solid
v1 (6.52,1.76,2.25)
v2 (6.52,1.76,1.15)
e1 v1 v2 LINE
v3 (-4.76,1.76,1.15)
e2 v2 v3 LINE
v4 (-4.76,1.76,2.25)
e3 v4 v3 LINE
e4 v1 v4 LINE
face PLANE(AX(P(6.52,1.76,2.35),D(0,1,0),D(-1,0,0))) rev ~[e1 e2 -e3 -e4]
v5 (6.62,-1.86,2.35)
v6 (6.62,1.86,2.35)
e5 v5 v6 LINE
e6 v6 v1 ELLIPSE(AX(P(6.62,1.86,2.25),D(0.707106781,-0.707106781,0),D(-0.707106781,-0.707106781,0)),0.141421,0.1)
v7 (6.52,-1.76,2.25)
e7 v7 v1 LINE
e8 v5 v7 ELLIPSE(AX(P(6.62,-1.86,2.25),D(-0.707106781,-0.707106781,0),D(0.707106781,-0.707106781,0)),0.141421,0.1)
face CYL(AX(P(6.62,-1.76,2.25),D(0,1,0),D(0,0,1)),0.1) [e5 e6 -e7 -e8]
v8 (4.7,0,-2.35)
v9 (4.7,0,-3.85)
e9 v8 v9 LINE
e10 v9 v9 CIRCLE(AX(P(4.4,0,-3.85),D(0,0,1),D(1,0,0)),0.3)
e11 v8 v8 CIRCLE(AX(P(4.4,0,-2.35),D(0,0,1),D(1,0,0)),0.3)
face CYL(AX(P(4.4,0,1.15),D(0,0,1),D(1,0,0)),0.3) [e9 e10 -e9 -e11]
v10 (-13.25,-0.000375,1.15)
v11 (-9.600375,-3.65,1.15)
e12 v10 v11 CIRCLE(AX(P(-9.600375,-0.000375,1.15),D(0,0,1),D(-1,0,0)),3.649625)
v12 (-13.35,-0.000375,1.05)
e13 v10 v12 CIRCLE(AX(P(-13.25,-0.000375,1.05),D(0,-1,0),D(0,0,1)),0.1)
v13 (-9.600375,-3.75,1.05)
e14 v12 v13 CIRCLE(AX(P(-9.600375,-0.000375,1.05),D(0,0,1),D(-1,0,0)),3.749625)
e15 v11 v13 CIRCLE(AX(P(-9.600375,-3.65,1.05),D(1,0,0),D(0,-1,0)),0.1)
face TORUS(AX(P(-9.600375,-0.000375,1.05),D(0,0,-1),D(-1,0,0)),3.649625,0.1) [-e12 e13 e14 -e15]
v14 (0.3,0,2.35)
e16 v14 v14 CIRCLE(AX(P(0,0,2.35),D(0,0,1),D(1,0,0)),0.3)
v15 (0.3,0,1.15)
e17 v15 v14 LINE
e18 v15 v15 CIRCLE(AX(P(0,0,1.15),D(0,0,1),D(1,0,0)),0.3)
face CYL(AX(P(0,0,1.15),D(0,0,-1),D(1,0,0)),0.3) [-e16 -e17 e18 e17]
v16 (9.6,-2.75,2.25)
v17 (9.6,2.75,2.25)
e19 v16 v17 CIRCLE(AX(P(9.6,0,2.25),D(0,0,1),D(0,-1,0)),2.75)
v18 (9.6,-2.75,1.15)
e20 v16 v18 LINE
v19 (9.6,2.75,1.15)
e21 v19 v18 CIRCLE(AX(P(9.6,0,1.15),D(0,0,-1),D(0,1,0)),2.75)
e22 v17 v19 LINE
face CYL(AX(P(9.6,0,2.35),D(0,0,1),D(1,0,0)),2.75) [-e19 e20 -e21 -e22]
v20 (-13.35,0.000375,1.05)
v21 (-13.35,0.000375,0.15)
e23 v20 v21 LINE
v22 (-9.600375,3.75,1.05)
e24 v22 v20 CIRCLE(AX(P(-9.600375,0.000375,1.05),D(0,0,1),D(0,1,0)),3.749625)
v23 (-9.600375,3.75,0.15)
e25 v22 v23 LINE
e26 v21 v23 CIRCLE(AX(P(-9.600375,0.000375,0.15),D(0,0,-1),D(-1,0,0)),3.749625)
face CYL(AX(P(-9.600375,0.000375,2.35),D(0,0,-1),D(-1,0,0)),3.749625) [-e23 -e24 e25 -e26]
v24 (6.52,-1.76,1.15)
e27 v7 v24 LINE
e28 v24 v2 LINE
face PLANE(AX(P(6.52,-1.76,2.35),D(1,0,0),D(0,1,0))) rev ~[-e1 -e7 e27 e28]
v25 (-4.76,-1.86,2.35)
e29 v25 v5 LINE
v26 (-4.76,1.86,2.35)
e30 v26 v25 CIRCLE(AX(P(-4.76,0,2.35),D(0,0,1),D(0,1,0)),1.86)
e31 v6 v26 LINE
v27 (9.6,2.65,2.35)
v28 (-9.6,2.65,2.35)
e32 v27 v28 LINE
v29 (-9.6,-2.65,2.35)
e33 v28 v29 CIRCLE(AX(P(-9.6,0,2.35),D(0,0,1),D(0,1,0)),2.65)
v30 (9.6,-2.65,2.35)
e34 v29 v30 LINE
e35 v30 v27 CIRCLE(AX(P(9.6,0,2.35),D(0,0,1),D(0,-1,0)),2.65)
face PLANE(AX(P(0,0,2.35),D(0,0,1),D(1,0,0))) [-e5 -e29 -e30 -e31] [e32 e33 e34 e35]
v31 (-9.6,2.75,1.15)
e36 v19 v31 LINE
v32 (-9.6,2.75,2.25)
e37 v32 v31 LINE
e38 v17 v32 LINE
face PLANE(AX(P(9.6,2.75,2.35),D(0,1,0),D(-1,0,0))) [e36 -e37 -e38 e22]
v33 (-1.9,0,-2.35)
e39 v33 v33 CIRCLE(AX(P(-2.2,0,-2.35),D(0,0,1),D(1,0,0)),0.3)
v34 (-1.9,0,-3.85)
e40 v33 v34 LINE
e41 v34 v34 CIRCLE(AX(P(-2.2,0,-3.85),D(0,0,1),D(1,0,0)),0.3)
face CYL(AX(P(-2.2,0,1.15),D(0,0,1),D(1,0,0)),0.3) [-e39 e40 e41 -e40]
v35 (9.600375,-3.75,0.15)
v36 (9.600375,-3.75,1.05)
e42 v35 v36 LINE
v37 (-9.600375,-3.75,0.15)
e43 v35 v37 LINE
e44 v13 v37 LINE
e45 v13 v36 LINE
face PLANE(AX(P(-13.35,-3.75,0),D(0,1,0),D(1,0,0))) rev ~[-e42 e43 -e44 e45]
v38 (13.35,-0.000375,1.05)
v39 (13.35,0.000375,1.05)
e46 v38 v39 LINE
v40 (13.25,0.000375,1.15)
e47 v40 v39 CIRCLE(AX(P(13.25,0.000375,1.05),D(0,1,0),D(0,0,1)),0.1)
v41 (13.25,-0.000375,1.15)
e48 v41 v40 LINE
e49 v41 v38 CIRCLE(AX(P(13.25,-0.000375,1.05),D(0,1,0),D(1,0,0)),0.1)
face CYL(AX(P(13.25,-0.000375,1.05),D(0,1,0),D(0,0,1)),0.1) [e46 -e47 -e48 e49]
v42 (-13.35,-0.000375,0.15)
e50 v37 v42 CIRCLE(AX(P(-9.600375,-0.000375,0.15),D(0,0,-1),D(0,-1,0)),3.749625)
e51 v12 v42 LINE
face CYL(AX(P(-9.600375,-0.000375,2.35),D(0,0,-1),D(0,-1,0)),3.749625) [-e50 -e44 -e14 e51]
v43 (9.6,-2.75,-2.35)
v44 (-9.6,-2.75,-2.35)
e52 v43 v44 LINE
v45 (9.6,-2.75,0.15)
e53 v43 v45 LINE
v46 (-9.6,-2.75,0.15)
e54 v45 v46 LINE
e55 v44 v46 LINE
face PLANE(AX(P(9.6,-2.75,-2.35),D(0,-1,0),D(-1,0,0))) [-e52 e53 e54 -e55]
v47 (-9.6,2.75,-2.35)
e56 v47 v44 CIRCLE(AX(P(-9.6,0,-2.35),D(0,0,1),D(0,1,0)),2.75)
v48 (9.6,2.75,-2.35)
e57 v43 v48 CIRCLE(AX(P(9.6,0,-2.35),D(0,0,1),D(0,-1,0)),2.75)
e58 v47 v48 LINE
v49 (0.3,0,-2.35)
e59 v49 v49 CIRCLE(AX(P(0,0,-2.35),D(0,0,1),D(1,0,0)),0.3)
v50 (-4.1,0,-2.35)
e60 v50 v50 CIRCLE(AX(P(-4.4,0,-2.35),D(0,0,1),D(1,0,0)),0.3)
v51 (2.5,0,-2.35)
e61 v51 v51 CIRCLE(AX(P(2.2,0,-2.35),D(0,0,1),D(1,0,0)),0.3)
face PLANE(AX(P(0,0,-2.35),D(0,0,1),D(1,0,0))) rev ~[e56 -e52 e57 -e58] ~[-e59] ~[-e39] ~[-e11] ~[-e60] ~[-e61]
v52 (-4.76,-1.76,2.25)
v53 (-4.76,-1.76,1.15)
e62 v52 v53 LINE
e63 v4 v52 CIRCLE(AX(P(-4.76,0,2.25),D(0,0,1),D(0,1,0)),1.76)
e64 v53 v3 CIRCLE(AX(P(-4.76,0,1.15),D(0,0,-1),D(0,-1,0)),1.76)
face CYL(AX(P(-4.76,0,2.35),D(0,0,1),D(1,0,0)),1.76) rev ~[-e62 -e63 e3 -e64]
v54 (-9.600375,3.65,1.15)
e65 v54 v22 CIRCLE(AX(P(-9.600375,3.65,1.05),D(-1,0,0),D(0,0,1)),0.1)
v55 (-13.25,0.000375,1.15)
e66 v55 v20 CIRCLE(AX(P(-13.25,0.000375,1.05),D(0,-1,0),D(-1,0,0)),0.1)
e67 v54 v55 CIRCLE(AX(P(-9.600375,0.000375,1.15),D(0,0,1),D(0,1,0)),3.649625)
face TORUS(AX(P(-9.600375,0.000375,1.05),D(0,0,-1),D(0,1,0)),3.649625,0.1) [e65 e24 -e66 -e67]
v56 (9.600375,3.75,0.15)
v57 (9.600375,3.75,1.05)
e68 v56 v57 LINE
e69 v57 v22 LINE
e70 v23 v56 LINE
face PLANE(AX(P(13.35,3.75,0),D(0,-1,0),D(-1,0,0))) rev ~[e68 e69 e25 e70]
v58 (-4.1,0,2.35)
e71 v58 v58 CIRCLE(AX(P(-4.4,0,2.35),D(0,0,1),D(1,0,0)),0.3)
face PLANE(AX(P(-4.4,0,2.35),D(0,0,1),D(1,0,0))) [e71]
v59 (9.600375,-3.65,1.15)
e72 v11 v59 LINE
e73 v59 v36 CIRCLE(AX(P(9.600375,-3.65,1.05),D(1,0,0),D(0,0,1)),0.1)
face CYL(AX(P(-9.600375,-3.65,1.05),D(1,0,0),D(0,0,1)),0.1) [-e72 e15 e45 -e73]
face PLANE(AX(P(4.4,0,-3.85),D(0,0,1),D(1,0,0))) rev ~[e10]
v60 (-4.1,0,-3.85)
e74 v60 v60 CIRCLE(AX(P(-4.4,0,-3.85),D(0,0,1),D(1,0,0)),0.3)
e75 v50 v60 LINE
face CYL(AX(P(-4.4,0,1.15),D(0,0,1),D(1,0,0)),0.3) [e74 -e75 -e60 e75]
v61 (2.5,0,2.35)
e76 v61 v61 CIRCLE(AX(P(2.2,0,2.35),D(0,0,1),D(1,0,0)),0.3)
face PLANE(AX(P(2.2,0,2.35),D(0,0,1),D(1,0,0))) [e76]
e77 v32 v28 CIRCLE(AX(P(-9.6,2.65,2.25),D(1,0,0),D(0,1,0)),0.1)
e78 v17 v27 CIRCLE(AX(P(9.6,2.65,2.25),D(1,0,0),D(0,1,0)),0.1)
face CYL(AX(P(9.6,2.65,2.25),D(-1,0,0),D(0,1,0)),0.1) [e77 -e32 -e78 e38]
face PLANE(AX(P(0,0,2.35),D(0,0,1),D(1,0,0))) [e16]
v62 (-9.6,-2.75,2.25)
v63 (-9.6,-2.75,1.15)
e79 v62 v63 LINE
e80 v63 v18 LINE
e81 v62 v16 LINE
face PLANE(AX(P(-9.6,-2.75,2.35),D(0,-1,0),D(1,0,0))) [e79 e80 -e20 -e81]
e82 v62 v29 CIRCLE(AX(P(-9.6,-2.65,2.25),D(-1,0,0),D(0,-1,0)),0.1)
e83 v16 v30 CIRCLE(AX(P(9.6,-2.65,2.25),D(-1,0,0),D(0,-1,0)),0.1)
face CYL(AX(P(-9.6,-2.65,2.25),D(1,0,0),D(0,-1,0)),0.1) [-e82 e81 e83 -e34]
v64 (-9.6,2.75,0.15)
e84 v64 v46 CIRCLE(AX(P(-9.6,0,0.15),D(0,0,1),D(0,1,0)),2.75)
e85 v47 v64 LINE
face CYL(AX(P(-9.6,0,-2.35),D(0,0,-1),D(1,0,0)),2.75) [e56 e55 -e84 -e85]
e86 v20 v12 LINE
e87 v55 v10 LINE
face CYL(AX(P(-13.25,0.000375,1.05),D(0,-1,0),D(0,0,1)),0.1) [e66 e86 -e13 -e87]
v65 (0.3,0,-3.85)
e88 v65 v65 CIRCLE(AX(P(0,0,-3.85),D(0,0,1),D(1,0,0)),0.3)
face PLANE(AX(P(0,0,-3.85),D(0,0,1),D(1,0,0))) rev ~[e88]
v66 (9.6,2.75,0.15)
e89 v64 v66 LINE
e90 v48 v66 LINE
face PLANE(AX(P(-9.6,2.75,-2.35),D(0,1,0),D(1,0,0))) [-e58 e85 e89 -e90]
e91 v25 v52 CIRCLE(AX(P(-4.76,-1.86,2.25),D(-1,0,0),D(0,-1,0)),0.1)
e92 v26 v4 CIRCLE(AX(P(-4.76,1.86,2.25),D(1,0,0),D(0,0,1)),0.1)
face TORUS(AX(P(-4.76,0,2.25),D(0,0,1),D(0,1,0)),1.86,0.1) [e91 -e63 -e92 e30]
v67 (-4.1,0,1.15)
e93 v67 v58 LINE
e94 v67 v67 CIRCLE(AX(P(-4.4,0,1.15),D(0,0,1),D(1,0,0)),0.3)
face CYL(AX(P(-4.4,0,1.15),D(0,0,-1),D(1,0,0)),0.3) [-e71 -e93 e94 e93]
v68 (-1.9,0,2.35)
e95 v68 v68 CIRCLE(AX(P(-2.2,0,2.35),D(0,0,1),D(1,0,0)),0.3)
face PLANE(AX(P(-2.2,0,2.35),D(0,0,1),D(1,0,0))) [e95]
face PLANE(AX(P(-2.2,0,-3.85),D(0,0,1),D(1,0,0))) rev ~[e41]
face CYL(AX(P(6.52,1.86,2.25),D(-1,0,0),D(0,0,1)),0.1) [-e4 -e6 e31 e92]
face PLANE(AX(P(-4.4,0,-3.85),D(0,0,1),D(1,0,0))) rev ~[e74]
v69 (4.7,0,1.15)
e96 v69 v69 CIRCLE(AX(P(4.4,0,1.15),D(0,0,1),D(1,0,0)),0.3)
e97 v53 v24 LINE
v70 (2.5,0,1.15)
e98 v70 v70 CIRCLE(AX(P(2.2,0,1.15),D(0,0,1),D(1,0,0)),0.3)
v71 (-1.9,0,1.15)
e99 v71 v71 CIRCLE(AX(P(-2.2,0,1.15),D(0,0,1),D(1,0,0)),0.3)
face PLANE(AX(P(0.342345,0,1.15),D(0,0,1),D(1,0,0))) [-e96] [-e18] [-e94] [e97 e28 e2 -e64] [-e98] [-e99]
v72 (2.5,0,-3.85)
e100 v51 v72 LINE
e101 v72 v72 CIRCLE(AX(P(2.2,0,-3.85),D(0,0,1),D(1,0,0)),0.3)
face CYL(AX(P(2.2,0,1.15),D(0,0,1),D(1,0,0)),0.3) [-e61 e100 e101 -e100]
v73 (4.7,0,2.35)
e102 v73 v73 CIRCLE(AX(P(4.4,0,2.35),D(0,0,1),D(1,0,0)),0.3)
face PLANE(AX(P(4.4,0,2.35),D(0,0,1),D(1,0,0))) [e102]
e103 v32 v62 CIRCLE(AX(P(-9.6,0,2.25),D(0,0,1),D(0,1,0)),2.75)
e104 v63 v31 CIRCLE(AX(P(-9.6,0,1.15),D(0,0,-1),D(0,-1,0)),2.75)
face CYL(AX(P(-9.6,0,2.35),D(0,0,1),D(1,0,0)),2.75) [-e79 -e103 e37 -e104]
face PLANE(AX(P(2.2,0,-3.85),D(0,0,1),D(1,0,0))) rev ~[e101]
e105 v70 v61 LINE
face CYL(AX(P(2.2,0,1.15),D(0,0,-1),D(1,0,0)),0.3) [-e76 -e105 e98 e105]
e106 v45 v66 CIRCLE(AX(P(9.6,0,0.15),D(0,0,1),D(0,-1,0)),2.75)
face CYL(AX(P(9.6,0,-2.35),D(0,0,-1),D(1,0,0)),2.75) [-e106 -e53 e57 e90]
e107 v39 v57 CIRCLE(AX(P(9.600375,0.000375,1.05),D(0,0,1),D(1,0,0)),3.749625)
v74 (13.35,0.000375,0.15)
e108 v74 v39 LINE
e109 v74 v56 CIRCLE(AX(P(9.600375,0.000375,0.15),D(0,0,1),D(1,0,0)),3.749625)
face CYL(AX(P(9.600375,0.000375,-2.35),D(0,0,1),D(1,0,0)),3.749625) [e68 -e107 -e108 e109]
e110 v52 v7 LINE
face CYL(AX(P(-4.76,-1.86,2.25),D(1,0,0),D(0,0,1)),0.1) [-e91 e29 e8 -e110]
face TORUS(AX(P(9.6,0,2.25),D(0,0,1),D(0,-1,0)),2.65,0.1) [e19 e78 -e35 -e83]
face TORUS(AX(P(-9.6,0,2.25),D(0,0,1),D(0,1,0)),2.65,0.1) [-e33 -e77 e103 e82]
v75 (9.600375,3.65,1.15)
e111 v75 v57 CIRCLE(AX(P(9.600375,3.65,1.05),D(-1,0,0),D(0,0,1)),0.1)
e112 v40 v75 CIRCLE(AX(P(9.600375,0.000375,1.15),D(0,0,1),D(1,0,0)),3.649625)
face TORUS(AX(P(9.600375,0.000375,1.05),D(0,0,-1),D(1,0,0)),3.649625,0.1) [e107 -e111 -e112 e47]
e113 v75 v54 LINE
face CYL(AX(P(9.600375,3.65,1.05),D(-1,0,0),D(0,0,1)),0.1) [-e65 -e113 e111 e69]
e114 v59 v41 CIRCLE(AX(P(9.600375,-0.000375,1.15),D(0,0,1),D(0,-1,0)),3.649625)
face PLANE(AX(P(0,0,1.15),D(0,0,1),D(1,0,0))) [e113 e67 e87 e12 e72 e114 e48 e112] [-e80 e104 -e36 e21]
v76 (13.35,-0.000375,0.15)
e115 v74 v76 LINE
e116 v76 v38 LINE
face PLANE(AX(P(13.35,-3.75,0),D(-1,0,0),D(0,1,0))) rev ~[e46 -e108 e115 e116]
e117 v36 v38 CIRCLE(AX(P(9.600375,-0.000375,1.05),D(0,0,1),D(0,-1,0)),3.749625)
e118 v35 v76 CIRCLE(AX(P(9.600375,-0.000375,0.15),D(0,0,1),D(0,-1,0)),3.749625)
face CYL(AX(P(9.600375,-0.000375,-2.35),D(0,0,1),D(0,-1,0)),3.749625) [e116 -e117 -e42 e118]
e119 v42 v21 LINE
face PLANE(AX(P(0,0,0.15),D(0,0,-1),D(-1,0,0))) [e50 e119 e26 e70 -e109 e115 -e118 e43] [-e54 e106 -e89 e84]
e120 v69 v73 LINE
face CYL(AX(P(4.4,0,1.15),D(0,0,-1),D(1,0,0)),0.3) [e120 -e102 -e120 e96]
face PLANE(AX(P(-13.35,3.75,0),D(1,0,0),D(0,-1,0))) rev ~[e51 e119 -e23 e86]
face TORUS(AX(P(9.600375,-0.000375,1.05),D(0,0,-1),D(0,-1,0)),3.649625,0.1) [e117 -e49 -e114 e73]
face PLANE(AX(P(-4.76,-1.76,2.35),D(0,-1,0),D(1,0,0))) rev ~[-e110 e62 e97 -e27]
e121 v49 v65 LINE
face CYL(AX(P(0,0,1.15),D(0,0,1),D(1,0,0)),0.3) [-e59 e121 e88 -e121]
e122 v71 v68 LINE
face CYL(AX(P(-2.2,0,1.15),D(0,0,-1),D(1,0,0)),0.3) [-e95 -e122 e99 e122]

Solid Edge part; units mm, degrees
sketch "Sketch1" plane through (0, 0, 0) normal (0, 0, 1) x (1, 0, 0)
  line L0 (-13.35, -3.75) -> (13.35, -3.75)
  line L1 (13.35, -3.75) -> (13.35, 3.75)
  line L2 (13.35, 3.75) -> (-13.35, 3.75)
  line L3 (-13.35, 3.75) -> (-13.35, -3.75)
  dimension "D1" = 26.7
  dimension "D2" = 7.5
extrude "Protrusion1" add sketch "Sketch1" along normal mid plane 4.7
fillet "Verrundung_1" radius 3.75 4 edges at (13.35, -3.75, 0) (13.35, 3.75, 0) (-13.35, -3.75, 0) (-13.35, 3.75, 0)
sketch "Sketch2" plane through (0, 0, 2.35) normal (0, 0, 1) x (1, 0, 0)
  line L0 (-9.6, -2.75) -> (9.6, -2.75)
  arc A0 (9.6, -2.75) -> (12.35, 0) centre (9.6, 0) ccw
  arc A1 (12.35, 0) -> (9.6, 2.75) centre (9.6, 0) ccw
  line L1 (9.6, 2.75) -> (-9.6, 2.75)
  arc A2 (-9.6, 2.75) -> (-12.35, 0) centre (-9.6, 0) ccw
  arc A3 (-9.6, -2.75) -> (-12.35, 0) centre (-9.6, 0) cw
  dimension "D1" = 19.2
extrude "Extrusionsausschnitt_1" cut sketch "Sketch2" against normal blind 1.2 flip side to cut
sketch "Sketch3" plane through (0, 0, -2.35) normal (0, 0, -1) x (1, 0, 0)
  line L0 (-9.6, -2.75) -> (9.6, -2.75)
  arc A0 (9.6, -2.75) -> (12.35, 0) centre (9.6, 0) ccw
  arc A1 (12.35, 0) -> (9.6, 2.75) centre (9.6, 0) ccw
  line L1 (9.6, 2.75) -> (-9.6, 2.75)
  arc A2 (-9.6, 2.75) -> (-12.35, 0) centre (-9.6, 0) ccw
  arc A3 (-9.6, -2.75) -> (-12.35, 0) centre (-9.6, 0) cw
  dimension "D1" = 19.2
extrude "Extrusionsausschnitt_2" cut sketch "Sketch3" against normal blind 2.5 flip side to cut
sketch "Sketch4" plane through (0, 0, 2.35) normal (0, 0, 1) x (1, 0, 0)
  line L0 (-4.76, -1.76) -> (6.52, -1.76)
  line L1 (6.52, -1.76) -> (6.52, 1.76)
  line L2 (6.52, 1.76) -> (-4.76, 1.76)
  arc A0 (-4.76, 1.76) -> (-6.52, 0) centre (-4.76, 0) ccw
  arc A1 (-4.76, -1.76) -> (-6.52, 0) centre (-4.76, 0) cw
  dimension "D1" = 11.28
  dimension "D2" = 3.52
extrude "Extrusionsausschnitt_3" cut sketch "Sketch4" against normal blind 1.2
sketch "Sketch5" plane through (0, 0, 1.15) normal (0, 0, 1) x (1, 0, 0)
  circle A0 centre (4.4, 0) radius 0.3
  circle A1 centre (2.2, 0) radius 0.3
  circle A2 centre (0, 0) radius 0.3
  circle A3 centre (-2.2, 0) radius 0.3
  circle A4 centre (-4.4, 0) radius 0.3
  dimension "D1" = 0.6
  dimension "D2" = 0.6
  dimension "D3" = 0.6
  dimension "D4" = 0.6
  dimension "D5" = 0.6
  dimension "D6" = 2.2
  dimension "D7" = 2.2
  dimension "D8" = 2.2
  dimension "D9" = 2.2
  dimension "D10" = 2.12
extrude "Extrusionsausprägung_2" add sketch "Sketch5" along normal blind 1.2 and the other way blind 5
fillet "Verrundung_2" radius 0.1 11 edges at (0.88, 1.76, 2.35) (-6.52, 0, 2.35) (0.88, -1.76, 2.35) (6.52, 0, 2.35) (0, 2.75, 2.35) (-12.35, 0, 2.35) (0, -2.75, 2.35) (12.35, 0, 2.35) (0, 3.75, 1.15) (-13.35, 0, 1.15) (0, -3.75, 1.15)
